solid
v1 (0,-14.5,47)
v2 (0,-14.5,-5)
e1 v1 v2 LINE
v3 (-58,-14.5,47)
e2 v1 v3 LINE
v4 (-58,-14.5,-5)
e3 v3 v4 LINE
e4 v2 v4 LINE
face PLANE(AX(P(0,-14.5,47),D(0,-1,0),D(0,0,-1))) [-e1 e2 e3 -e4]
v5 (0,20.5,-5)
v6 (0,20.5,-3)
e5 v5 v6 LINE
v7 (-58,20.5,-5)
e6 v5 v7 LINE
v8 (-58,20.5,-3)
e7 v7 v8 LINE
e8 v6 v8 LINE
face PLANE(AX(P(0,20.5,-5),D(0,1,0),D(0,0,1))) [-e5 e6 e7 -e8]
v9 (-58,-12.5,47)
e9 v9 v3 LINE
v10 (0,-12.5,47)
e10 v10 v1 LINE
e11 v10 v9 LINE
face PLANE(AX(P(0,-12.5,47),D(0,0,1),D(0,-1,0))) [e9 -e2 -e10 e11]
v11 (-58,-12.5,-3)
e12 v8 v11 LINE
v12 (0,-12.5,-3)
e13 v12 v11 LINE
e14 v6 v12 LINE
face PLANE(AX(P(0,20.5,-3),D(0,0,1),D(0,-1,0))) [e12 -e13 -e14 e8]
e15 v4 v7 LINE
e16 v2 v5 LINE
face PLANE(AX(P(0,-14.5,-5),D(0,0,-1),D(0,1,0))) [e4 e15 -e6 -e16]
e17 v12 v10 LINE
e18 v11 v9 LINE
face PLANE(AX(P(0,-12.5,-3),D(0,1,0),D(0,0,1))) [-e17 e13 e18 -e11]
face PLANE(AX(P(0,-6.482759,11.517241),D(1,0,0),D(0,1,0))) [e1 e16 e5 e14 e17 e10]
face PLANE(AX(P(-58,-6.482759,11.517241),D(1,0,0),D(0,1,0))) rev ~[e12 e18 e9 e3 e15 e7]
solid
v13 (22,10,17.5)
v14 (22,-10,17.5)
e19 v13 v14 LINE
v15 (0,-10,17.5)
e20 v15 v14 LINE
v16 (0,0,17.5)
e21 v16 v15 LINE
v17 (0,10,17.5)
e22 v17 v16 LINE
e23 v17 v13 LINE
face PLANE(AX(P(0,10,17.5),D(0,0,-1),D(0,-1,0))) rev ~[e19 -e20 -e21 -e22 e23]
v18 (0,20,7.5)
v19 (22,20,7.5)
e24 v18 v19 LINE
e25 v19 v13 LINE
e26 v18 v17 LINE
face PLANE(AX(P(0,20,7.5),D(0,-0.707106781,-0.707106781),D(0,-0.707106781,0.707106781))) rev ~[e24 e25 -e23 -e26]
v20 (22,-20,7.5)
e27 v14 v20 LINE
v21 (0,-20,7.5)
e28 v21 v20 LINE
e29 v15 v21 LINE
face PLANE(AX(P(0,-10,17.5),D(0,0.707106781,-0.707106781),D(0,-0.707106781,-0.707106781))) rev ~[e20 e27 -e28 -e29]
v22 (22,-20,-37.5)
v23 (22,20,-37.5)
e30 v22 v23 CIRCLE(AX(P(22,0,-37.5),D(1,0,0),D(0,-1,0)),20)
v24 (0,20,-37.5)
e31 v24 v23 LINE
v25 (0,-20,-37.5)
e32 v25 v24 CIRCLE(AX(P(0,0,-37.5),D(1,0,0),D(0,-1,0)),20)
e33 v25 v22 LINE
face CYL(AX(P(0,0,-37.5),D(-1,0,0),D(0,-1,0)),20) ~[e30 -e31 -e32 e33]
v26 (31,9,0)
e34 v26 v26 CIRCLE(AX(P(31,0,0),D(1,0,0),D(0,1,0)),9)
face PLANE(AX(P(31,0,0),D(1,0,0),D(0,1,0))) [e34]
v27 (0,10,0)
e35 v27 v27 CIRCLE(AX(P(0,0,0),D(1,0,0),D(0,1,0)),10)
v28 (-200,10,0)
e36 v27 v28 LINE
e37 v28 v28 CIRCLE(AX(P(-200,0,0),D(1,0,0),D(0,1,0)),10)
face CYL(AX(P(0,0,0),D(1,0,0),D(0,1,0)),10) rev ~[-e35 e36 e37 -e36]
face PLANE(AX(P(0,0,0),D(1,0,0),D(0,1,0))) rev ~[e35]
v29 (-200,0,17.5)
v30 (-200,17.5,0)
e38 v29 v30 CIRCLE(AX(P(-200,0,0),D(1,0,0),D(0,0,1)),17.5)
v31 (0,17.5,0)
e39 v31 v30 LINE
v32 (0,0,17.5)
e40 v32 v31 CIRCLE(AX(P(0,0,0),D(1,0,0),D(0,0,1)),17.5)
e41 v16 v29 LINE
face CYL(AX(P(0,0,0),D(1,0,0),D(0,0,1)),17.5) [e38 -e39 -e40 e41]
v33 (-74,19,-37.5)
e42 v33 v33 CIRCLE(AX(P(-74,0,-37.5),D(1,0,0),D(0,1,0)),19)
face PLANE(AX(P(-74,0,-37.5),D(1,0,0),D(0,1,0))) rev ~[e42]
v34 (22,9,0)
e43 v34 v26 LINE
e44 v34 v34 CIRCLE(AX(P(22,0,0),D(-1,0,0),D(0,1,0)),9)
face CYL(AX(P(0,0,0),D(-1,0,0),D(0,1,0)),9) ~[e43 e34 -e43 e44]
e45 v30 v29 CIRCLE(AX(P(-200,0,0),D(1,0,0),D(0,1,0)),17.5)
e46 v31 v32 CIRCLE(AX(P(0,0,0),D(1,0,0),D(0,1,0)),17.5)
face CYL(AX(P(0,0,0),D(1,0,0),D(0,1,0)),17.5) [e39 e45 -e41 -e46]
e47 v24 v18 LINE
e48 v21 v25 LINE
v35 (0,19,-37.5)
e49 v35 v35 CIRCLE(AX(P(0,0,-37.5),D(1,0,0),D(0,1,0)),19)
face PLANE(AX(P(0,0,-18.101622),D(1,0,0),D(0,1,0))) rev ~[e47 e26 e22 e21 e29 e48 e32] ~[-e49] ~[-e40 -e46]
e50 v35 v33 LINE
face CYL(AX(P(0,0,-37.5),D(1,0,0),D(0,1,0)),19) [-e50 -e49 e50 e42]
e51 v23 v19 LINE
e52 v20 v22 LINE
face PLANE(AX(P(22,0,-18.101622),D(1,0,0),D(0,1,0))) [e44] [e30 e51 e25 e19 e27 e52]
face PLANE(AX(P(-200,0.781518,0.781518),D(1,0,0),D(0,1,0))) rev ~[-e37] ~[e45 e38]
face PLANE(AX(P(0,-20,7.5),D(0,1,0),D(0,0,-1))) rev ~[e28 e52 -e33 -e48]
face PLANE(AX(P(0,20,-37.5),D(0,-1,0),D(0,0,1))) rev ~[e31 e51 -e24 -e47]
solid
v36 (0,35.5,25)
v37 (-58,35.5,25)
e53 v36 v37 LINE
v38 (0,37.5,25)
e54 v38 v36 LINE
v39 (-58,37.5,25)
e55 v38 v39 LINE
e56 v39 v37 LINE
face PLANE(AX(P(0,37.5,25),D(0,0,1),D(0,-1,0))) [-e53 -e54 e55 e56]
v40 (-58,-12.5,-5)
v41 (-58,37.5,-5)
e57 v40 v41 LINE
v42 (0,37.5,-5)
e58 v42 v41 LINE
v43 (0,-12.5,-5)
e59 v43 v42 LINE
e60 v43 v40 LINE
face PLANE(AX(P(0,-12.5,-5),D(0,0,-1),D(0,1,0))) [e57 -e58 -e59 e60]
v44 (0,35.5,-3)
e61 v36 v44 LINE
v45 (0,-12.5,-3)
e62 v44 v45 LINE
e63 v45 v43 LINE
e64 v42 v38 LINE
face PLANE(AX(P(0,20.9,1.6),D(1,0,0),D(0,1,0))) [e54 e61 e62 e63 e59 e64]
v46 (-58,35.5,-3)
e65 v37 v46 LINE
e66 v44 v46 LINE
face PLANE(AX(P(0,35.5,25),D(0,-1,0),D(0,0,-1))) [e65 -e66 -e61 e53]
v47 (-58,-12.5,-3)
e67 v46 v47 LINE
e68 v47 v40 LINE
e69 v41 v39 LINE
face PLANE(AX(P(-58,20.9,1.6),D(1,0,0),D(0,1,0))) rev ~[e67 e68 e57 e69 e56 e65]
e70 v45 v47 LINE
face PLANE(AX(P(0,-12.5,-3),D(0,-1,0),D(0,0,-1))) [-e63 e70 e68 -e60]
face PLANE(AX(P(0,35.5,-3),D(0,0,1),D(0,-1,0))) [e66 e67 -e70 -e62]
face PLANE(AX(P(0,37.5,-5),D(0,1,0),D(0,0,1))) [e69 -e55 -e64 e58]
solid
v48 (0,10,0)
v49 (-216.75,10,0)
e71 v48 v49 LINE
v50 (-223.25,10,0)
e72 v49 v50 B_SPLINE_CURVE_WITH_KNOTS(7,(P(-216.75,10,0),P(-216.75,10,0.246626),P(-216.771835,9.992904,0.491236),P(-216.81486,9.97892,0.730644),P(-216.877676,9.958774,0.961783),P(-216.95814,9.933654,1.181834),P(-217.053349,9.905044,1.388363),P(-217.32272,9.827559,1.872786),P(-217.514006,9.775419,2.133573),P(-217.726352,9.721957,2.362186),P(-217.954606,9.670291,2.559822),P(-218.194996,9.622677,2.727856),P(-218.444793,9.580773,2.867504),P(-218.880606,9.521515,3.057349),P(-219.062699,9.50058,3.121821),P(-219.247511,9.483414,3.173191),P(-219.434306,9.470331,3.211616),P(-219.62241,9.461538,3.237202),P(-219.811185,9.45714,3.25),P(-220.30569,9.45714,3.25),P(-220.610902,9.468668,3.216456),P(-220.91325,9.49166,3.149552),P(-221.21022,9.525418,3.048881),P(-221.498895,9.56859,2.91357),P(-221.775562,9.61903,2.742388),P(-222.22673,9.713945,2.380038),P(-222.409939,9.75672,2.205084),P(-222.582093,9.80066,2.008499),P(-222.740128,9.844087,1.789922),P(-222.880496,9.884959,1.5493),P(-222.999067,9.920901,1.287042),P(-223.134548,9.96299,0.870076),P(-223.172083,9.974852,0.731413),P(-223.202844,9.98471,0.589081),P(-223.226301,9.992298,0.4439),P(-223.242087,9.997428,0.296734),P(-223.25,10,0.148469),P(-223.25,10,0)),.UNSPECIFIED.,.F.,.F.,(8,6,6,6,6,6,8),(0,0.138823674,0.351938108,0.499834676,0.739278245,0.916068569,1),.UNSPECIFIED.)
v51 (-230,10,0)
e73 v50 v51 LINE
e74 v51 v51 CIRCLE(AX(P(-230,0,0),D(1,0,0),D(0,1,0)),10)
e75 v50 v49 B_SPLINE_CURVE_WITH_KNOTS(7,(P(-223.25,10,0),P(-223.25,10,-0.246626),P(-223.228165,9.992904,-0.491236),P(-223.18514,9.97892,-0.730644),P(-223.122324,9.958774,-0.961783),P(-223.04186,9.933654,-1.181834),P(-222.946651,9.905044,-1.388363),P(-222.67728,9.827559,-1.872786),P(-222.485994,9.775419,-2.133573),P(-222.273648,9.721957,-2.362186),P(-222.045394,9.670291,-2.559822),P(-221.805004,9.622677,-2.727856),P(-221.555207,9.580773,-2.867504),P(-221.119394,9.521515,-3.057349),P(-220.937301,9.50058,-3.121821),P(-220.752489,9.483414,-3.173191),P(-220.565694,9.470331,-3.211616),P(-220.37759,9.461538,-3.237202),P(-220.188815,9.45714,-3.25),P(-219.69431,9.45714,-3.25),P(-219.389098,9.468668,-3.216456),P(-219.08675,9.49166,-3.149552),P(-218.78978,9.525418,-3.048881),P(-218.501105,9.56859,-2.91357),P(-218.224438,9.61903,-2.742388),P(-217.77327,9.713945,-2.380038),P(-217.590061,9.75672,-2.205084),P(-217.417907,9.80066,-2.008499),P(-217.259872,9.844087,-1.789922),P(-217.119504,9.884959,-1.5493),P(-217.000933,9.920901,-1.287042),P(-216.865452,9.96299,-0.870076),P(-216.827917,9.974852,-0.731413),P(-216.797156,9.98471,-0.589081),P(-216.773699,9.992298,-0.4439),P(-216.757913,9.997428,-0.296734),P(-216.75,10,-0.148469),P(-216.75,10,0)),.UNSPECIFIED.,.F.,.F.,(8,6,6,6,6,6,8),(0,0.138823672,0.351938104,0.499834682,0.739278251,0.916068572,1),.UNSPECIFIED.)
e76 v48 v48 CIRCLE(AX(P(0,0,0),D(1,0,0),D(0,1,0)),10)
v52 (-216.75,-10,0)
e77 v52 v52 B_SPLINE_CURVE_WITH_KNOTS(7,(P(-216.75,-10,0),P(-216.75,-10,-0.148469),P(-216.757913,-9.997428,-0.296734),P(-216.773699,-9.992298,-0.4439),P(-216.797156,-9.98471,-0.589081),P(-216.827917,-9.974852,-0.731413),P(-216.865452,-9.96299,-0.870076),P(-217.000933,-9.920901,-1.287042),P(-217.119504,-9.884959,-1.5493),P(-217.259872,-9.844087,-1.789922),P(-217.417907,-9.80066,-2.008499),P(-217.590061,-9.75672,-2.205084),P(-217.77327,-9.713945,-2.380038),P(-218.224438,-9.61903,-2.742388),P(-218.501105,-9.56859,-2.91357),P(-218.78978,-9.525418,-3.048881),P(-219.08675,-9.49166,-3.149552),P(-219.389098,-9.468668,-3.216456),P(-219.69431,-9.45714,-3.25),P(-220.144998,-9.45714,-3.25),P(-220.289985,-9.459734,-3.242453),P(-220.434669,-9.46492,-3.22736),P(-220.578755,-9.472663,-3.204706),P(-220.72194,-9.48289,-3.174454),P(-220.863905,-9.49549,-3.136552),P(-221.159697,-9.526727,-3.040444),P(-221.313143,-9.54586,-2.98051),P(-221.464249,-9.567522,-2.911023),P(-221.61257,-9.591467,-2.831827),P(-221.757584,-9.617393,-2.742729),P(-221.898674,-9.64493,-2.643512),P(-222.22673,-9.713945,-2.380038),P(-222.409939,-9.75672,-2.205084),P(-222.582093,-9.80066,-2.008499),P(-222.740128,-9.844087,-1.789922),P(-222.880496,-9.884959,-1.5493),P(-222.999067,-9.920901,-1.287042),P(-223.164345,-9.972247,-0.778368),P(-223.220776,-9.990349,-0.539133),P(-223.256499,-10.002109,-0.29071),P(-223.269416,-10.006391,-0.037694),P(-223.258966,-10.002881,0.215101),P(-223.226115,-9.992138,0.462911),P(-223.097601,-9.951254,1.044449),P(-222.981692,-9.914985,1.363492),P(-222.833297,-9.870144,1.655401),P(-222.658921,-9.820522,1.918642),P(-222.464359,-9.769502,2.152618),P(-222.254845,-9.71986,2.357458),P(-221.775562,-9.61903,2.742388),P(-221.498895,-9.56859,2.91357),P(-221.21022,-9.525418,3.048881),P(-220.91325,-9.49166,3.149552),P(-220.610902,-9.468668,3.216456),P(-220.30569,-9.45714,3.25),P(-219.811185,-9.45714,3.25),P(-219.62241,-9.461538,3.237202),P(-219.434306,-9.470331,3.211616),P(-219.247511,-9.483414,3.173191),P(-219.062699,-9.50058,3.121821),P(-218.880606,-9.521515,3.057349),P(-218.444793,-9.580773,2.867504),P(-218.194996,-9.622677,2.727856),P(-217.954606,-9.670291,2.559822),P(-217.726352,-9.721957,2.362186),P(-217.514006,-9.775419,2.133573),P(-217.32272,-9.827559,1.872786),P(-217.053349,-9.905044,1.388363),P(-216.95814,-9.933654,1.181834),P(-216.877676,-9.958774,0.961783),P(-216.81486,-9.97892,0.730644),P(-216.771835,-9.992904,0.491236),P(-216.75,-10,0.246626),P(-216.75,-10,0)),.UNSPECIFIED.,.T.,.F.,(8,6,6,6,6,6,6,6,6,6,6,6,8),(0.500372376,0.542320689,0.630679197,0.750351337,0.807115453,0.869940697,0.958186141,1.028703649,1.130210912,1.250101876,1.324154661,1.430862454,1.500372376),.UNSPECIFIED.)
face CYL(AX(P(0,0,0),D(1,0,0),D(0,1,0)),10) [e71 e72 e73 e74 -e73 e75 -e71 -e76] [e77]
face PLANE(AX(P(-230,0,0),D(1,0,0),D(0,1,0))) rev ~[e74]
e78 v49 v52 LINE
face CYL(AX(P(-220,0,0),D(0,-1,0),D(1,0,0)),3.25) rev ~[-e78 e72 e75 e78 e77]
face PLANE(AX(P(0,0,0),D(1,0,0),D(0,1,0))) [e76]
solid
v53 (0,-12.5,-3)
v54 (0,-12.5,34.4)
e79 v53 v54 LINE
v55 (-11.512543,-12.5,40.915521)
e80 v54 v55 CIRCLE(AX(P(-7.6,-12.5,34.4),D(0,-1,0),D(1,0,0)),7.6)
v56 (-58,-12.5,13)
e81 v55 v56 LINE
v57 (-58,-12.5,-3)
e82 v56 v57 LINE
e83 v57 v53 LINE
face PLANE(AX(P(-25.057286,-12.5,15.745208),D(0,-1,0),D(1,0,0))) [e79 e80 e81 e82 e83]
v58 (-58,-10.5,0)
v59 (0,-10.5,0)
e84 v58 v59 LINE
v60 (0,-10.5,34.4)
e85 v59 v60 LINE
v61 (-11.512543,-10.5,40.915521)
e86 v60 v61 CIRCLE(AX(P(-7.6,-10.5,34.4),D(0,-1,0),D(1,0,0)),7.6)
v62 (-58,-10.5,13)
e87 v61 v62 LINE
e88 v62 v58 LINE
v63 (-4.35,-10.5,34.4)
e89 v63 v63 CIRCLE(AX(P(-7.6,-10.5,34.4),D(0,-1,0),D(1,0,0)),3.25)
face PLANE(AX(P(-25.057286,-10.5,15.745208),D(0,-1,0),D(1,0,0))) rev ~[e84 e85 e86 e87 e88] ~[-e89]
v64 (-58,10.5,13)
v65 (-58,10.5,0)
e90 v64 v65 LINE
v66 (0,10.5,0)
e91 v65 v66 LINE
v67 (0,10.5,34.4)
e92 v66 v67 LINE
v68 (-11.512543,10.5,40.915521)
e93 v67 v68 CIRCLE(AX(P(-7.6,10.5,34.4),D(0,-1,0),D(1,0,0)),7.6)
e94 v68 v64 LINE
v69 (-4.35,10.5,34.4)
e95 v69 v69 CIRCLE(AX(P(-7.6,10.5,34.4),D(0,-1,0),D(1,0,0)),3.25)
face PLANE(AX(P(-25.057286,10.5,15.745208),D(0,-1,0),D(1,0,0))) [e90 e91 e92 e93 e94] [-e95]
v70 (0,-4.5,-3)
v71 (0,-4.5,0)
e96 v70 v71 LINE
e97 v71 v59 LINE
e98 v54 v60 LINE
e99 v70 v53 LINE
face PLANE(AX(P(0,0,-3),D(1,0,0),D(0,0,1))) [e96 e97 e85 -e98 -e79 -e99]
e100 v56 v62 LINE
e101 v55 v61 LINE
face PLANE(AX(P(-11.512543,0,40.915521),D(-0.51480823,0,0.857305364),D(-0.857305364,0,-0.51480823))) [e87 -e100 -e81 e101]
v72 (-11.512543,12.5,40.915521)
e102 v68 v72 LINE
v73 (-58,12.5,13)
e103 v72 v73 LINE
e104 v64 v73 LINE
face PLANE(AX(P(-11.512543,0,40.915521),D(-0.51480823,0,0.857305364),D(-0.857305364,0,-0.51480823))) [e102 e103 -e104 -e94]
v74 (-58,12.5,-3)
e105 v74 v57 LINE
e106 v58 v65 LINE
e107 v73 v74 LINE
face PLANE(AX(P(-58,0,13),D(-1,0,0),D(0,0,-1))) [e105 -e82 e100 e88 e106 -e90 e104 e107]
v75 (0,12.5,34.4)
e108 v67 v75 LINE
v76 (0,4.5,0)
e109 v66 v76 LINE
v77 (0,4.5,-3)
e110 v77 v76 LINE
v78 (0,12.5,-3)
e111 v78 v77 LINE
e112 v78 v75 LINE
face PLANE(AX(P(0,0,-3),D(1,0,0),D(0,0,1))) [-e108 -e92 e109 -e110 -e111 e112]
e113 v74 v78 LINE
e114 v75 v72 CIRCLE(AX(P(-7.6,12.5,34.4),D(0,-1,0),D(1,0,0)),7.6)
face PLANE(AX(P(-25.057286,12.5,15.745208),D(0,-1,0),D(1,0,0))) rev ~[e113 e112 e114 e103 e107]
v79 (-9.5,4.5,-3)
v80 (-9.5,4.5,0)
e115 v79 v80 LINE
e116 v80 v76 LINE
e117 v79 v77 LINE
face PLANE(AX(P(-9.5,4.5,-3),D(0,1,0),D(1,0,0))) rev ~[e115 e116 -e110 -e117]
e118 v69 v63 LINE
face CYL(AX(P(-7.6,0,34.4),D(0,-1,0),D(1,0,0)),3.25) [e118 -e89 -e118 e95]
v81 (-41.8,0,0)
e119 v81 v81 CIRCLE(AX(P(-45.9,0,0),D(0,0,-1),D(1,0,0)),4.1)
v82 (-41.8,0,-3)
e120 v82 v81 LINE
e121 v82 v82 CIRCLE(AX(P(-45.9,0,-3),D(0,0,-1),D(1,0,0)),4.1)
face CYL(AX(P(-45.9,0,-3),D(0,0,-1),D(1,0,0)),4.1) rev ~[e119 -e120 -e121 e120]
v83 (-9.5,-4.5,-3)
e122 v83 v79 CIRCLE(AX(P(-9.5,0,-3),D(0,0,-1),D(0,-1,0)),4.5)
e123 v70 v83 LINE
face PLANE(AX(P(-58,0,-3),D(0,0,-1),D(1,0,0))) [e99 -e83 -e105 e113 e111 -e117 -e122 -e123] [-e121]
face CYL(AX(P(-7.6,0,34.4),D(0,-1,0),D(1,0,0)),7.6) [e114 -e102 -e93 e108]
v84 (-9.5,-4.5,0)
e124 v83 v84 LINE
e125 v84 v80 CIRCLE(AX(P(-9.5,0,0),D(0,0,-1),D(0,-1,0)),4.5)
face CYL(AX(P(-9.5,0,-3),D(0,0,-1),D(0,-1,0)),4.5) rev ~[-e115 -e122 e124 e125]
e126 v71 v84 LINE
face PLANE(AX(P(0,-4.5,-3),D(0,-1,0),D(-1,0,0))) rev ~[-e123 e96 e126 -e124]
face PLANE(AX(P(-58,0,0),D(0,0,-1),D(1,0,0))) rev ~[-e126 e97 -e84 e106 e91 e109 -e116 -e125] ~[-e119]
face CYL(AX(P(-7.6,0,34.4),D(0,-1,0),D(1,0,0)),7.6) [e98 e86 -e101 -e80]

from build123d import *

# Parameters (mm, degrees)
F2_R      = 19
F2_R_2    = 10
F2_R_3    = 9
F3_DEPTH  = 22
F4_DEPTH  = 74
F5_DEPTH  = 200
F6_DEPTH  = 31
F7_R      = 10
F8_DEPTH  = 230
F9_R      = 3.25
F10_DEPTH = 10
F11_R     = 3.25
F12_DEPTH = 10
F13_R     = 3.25
F13_W     = 58
F13_H     = 3
F14_DEPTH = 12.5
F15_DEPTH = 10.5
F16_DEPTH = 12.5
F18_DEPTH = 58
F20_DEPTH = 58
F21_R     = 4.1
F22_DEPTH = 5


with BuildPart() as f3:
    # F2 (on Right) → F3 (new body)
    with BuildSketch(Plane.YZ):
        with BuildLine():
            Line((-10, 17.5), (-20, 7.5))
            Line((-20, 7.5), (-20, -37.5))
            ThreePointArc((-20, -37.5), (0, -57.5), (20, -37.5))
            Line((20, -37.5), (20, 7.5))
            Line((20, 7.5), (10, 17.5))
            Line((10, 17.5), (0, 17.5))
            Line((0, 17.5), (-10, 17.5))
        make_face()
        with Locations((0, -37.5)):
            Circle(F2_R, mode=Mode.SUBTRACT)
        with BuildLine():
            ThreePointArc((17.5, 0), (-12.3743686708, -12.3743686708), (0, 17.5))
            ThreePointArc((0, 17.5), (12.3743686708, 12.3743686708), (17.5, 0))
        make_face(mode=Mode.SUBTRACT)
        with Locations((0, -37.5)):
            Circle(F2_R)
        with BuildLine():
            ThreePointArc((17.5, 0), (12.3743686708, 12.3743686708), (0, 17.5))
            ThreePointArc((0, 17.5), (-12.3743686708, -12.3743686708), (17.5, 0))
        make_face()
        Circle(F2_R_2, mode=Mode.SUBTRACT)
        Circle(F2_R_2)
        Circle(F2_R_3, mode=Mode.SUBTRACT)
        Circle(F2_R_3)
    extrude(amount=F3_DEPTH)

    # F2 (on Right) → F4 (join)
    with BuildSketch(Plane.YZ):
        with Locations((0, -37.5)):
            Circle(F2_R)
    extrude(amount=-F4_DEPTH)

    # F2 (on Right) → F5 (join)
    with BuildSketch(Plane.YZ):
        with BuildLine():
            ThreePointArc((17.5, 0), (12.3743686708, 12.3743686708), (0, 17.5))
            ThreePointArc((0, 17.5), (-12.3743686708, -12.3743686708), (17.5, 0))
        make_face()
        Circle(F2_R_2, mode=Mode.SUBTRACT)
    extrude(amount=-F5_DEPTH)

    # F2 (on Right) → F6 (join)
    with BuildSketch(Plane.YZ):
        Circle(F2_R_3)
    extrude(amount=F6_DEPTH)

    # F11 (on Front) → F12 (cut, symmetric)
    with BuildSketch(Plane.XZ):
        with Locations((40, 0)):
            Circle(F11_R)
    extrude(amount=F12_DEPTH, both=True, mode=Mode.SUBTRACT)


with BuildPart() as f8:
    # F7 (on Right) → F8 (new body)
    with BuildSketch(Plane.YZ):
        Circle(F7_R)
    extrude(amount=-F8_DEPTH)

    # F9 (on Front) → F10 (cut, symmetric)
    with BuildSketch(Plane.XZ):
        with Locations((-220, 0)):
            Circle(F9_R)
    extrude(amount=F10_DEPTH, both=True, mode=Mode.SUBTRACT)


with BuildPart() as f14:
    # F13 (on Front) → F14 (new body, symmetric)
    with BuildSketch(Plane.XZ):
        with BuildLine():
            Line((-58, 0), (0, 0))
            Line((0, 0), (0, 34.4))
            ThreePointArc((0, 34.4), (-3.8566941985, 41.0142015147), (-11.5125425465, 40.9155207637))
            Line((-11.5125425465, 40.9155207637), (-58, 13))
            Line((-58, 13), (-58, 0))
        make_face()
        with Locations((-7.6, 34.4)):
            Circle(F13_R, mode=Mode.SUBTRACT)
        with Locations((-29, -1.5)):
            Rectangle(F13_W, F13_H)
    extrude(amount=F14_DEPTH, both=True)

    # F13 (on Front) → F15 (cut, symmetric)
    with BuildSketch(Plane.XZ):
        with BuildLine():
            Line((-58, 0), (0, 0))
            Line((0, 0), (0, 34.4))
            ThreePointArc((0, 34.4), (-3.8566941985, 41.0142015147), (-11.5125425465, 40.9155207637))
            Line((-11.5125425465, 40.9155207637), (-58, 13))
            Line((-58, 13), (-58, 0))
        make_face()
        with Locations((-7.6, 34.4)):
            Circle(F13_R, mode=Mode.SUBTRACT)
    extrude(amount=F15_DEPTH, both=True, mode=Mode.SUBTRACT)

    # F13 (on Front) → F16 (join, symmetric)
    with BuildSketch(Plane.XZ):
        with Locations((-7.6, 34.4)):
            Circle(F13_R)
    extrude(amount=F16_DEPTH, both=True)

    # F21 (on face) → F22 (cut)
    with BuildSketch(Plane(origin=(0, 0, -3), x_dir=(1, 0, 0), z_dir=(0, 0, -1))):
        with Locations((-45.9, 0)):
            Circle(F21_R)
        with BuildLine():
            Line((0, 4.5), (-9.5, 4.5))
            ThreePointArc((-9.5, 4.5), (-14, 0), (-9.5, -4.5))
            Line((-9.5, -4.5), (0, -4.5))
            Line((0, -4.5), (0, 4.5))
        make_face()
    extrude(amount=-F22_DEPTH, mode=Mode.SUBTRACT)


with BuildPart() as f18:
    # F17 (on face) → F18 (new body)
    with BuildSketch(Plane.YZ):
        Polygon((-14.5, -5), (20.5, -5), (20.5, -3), (-12.5, -3), (-12.5, 47), (-14.5, 47), align=None)
    extrude(amount=-F18_DEPTH)


with BuildPart() as f20:
    # F19 (on face) → F20 (new body)
    with BuildSketch(Plane.YZ):
        Polygon((12.5, -3), (-12.5, -3), (-12.5, -5), (37.5, -5), (37.5, 25), (35.5, 25), (35.5, -3), align=None)
    extrude(amount=-F20_DEPTH)


solid = Compound([f3.part, f8.part, f14.part, f18.part, f20.part])
